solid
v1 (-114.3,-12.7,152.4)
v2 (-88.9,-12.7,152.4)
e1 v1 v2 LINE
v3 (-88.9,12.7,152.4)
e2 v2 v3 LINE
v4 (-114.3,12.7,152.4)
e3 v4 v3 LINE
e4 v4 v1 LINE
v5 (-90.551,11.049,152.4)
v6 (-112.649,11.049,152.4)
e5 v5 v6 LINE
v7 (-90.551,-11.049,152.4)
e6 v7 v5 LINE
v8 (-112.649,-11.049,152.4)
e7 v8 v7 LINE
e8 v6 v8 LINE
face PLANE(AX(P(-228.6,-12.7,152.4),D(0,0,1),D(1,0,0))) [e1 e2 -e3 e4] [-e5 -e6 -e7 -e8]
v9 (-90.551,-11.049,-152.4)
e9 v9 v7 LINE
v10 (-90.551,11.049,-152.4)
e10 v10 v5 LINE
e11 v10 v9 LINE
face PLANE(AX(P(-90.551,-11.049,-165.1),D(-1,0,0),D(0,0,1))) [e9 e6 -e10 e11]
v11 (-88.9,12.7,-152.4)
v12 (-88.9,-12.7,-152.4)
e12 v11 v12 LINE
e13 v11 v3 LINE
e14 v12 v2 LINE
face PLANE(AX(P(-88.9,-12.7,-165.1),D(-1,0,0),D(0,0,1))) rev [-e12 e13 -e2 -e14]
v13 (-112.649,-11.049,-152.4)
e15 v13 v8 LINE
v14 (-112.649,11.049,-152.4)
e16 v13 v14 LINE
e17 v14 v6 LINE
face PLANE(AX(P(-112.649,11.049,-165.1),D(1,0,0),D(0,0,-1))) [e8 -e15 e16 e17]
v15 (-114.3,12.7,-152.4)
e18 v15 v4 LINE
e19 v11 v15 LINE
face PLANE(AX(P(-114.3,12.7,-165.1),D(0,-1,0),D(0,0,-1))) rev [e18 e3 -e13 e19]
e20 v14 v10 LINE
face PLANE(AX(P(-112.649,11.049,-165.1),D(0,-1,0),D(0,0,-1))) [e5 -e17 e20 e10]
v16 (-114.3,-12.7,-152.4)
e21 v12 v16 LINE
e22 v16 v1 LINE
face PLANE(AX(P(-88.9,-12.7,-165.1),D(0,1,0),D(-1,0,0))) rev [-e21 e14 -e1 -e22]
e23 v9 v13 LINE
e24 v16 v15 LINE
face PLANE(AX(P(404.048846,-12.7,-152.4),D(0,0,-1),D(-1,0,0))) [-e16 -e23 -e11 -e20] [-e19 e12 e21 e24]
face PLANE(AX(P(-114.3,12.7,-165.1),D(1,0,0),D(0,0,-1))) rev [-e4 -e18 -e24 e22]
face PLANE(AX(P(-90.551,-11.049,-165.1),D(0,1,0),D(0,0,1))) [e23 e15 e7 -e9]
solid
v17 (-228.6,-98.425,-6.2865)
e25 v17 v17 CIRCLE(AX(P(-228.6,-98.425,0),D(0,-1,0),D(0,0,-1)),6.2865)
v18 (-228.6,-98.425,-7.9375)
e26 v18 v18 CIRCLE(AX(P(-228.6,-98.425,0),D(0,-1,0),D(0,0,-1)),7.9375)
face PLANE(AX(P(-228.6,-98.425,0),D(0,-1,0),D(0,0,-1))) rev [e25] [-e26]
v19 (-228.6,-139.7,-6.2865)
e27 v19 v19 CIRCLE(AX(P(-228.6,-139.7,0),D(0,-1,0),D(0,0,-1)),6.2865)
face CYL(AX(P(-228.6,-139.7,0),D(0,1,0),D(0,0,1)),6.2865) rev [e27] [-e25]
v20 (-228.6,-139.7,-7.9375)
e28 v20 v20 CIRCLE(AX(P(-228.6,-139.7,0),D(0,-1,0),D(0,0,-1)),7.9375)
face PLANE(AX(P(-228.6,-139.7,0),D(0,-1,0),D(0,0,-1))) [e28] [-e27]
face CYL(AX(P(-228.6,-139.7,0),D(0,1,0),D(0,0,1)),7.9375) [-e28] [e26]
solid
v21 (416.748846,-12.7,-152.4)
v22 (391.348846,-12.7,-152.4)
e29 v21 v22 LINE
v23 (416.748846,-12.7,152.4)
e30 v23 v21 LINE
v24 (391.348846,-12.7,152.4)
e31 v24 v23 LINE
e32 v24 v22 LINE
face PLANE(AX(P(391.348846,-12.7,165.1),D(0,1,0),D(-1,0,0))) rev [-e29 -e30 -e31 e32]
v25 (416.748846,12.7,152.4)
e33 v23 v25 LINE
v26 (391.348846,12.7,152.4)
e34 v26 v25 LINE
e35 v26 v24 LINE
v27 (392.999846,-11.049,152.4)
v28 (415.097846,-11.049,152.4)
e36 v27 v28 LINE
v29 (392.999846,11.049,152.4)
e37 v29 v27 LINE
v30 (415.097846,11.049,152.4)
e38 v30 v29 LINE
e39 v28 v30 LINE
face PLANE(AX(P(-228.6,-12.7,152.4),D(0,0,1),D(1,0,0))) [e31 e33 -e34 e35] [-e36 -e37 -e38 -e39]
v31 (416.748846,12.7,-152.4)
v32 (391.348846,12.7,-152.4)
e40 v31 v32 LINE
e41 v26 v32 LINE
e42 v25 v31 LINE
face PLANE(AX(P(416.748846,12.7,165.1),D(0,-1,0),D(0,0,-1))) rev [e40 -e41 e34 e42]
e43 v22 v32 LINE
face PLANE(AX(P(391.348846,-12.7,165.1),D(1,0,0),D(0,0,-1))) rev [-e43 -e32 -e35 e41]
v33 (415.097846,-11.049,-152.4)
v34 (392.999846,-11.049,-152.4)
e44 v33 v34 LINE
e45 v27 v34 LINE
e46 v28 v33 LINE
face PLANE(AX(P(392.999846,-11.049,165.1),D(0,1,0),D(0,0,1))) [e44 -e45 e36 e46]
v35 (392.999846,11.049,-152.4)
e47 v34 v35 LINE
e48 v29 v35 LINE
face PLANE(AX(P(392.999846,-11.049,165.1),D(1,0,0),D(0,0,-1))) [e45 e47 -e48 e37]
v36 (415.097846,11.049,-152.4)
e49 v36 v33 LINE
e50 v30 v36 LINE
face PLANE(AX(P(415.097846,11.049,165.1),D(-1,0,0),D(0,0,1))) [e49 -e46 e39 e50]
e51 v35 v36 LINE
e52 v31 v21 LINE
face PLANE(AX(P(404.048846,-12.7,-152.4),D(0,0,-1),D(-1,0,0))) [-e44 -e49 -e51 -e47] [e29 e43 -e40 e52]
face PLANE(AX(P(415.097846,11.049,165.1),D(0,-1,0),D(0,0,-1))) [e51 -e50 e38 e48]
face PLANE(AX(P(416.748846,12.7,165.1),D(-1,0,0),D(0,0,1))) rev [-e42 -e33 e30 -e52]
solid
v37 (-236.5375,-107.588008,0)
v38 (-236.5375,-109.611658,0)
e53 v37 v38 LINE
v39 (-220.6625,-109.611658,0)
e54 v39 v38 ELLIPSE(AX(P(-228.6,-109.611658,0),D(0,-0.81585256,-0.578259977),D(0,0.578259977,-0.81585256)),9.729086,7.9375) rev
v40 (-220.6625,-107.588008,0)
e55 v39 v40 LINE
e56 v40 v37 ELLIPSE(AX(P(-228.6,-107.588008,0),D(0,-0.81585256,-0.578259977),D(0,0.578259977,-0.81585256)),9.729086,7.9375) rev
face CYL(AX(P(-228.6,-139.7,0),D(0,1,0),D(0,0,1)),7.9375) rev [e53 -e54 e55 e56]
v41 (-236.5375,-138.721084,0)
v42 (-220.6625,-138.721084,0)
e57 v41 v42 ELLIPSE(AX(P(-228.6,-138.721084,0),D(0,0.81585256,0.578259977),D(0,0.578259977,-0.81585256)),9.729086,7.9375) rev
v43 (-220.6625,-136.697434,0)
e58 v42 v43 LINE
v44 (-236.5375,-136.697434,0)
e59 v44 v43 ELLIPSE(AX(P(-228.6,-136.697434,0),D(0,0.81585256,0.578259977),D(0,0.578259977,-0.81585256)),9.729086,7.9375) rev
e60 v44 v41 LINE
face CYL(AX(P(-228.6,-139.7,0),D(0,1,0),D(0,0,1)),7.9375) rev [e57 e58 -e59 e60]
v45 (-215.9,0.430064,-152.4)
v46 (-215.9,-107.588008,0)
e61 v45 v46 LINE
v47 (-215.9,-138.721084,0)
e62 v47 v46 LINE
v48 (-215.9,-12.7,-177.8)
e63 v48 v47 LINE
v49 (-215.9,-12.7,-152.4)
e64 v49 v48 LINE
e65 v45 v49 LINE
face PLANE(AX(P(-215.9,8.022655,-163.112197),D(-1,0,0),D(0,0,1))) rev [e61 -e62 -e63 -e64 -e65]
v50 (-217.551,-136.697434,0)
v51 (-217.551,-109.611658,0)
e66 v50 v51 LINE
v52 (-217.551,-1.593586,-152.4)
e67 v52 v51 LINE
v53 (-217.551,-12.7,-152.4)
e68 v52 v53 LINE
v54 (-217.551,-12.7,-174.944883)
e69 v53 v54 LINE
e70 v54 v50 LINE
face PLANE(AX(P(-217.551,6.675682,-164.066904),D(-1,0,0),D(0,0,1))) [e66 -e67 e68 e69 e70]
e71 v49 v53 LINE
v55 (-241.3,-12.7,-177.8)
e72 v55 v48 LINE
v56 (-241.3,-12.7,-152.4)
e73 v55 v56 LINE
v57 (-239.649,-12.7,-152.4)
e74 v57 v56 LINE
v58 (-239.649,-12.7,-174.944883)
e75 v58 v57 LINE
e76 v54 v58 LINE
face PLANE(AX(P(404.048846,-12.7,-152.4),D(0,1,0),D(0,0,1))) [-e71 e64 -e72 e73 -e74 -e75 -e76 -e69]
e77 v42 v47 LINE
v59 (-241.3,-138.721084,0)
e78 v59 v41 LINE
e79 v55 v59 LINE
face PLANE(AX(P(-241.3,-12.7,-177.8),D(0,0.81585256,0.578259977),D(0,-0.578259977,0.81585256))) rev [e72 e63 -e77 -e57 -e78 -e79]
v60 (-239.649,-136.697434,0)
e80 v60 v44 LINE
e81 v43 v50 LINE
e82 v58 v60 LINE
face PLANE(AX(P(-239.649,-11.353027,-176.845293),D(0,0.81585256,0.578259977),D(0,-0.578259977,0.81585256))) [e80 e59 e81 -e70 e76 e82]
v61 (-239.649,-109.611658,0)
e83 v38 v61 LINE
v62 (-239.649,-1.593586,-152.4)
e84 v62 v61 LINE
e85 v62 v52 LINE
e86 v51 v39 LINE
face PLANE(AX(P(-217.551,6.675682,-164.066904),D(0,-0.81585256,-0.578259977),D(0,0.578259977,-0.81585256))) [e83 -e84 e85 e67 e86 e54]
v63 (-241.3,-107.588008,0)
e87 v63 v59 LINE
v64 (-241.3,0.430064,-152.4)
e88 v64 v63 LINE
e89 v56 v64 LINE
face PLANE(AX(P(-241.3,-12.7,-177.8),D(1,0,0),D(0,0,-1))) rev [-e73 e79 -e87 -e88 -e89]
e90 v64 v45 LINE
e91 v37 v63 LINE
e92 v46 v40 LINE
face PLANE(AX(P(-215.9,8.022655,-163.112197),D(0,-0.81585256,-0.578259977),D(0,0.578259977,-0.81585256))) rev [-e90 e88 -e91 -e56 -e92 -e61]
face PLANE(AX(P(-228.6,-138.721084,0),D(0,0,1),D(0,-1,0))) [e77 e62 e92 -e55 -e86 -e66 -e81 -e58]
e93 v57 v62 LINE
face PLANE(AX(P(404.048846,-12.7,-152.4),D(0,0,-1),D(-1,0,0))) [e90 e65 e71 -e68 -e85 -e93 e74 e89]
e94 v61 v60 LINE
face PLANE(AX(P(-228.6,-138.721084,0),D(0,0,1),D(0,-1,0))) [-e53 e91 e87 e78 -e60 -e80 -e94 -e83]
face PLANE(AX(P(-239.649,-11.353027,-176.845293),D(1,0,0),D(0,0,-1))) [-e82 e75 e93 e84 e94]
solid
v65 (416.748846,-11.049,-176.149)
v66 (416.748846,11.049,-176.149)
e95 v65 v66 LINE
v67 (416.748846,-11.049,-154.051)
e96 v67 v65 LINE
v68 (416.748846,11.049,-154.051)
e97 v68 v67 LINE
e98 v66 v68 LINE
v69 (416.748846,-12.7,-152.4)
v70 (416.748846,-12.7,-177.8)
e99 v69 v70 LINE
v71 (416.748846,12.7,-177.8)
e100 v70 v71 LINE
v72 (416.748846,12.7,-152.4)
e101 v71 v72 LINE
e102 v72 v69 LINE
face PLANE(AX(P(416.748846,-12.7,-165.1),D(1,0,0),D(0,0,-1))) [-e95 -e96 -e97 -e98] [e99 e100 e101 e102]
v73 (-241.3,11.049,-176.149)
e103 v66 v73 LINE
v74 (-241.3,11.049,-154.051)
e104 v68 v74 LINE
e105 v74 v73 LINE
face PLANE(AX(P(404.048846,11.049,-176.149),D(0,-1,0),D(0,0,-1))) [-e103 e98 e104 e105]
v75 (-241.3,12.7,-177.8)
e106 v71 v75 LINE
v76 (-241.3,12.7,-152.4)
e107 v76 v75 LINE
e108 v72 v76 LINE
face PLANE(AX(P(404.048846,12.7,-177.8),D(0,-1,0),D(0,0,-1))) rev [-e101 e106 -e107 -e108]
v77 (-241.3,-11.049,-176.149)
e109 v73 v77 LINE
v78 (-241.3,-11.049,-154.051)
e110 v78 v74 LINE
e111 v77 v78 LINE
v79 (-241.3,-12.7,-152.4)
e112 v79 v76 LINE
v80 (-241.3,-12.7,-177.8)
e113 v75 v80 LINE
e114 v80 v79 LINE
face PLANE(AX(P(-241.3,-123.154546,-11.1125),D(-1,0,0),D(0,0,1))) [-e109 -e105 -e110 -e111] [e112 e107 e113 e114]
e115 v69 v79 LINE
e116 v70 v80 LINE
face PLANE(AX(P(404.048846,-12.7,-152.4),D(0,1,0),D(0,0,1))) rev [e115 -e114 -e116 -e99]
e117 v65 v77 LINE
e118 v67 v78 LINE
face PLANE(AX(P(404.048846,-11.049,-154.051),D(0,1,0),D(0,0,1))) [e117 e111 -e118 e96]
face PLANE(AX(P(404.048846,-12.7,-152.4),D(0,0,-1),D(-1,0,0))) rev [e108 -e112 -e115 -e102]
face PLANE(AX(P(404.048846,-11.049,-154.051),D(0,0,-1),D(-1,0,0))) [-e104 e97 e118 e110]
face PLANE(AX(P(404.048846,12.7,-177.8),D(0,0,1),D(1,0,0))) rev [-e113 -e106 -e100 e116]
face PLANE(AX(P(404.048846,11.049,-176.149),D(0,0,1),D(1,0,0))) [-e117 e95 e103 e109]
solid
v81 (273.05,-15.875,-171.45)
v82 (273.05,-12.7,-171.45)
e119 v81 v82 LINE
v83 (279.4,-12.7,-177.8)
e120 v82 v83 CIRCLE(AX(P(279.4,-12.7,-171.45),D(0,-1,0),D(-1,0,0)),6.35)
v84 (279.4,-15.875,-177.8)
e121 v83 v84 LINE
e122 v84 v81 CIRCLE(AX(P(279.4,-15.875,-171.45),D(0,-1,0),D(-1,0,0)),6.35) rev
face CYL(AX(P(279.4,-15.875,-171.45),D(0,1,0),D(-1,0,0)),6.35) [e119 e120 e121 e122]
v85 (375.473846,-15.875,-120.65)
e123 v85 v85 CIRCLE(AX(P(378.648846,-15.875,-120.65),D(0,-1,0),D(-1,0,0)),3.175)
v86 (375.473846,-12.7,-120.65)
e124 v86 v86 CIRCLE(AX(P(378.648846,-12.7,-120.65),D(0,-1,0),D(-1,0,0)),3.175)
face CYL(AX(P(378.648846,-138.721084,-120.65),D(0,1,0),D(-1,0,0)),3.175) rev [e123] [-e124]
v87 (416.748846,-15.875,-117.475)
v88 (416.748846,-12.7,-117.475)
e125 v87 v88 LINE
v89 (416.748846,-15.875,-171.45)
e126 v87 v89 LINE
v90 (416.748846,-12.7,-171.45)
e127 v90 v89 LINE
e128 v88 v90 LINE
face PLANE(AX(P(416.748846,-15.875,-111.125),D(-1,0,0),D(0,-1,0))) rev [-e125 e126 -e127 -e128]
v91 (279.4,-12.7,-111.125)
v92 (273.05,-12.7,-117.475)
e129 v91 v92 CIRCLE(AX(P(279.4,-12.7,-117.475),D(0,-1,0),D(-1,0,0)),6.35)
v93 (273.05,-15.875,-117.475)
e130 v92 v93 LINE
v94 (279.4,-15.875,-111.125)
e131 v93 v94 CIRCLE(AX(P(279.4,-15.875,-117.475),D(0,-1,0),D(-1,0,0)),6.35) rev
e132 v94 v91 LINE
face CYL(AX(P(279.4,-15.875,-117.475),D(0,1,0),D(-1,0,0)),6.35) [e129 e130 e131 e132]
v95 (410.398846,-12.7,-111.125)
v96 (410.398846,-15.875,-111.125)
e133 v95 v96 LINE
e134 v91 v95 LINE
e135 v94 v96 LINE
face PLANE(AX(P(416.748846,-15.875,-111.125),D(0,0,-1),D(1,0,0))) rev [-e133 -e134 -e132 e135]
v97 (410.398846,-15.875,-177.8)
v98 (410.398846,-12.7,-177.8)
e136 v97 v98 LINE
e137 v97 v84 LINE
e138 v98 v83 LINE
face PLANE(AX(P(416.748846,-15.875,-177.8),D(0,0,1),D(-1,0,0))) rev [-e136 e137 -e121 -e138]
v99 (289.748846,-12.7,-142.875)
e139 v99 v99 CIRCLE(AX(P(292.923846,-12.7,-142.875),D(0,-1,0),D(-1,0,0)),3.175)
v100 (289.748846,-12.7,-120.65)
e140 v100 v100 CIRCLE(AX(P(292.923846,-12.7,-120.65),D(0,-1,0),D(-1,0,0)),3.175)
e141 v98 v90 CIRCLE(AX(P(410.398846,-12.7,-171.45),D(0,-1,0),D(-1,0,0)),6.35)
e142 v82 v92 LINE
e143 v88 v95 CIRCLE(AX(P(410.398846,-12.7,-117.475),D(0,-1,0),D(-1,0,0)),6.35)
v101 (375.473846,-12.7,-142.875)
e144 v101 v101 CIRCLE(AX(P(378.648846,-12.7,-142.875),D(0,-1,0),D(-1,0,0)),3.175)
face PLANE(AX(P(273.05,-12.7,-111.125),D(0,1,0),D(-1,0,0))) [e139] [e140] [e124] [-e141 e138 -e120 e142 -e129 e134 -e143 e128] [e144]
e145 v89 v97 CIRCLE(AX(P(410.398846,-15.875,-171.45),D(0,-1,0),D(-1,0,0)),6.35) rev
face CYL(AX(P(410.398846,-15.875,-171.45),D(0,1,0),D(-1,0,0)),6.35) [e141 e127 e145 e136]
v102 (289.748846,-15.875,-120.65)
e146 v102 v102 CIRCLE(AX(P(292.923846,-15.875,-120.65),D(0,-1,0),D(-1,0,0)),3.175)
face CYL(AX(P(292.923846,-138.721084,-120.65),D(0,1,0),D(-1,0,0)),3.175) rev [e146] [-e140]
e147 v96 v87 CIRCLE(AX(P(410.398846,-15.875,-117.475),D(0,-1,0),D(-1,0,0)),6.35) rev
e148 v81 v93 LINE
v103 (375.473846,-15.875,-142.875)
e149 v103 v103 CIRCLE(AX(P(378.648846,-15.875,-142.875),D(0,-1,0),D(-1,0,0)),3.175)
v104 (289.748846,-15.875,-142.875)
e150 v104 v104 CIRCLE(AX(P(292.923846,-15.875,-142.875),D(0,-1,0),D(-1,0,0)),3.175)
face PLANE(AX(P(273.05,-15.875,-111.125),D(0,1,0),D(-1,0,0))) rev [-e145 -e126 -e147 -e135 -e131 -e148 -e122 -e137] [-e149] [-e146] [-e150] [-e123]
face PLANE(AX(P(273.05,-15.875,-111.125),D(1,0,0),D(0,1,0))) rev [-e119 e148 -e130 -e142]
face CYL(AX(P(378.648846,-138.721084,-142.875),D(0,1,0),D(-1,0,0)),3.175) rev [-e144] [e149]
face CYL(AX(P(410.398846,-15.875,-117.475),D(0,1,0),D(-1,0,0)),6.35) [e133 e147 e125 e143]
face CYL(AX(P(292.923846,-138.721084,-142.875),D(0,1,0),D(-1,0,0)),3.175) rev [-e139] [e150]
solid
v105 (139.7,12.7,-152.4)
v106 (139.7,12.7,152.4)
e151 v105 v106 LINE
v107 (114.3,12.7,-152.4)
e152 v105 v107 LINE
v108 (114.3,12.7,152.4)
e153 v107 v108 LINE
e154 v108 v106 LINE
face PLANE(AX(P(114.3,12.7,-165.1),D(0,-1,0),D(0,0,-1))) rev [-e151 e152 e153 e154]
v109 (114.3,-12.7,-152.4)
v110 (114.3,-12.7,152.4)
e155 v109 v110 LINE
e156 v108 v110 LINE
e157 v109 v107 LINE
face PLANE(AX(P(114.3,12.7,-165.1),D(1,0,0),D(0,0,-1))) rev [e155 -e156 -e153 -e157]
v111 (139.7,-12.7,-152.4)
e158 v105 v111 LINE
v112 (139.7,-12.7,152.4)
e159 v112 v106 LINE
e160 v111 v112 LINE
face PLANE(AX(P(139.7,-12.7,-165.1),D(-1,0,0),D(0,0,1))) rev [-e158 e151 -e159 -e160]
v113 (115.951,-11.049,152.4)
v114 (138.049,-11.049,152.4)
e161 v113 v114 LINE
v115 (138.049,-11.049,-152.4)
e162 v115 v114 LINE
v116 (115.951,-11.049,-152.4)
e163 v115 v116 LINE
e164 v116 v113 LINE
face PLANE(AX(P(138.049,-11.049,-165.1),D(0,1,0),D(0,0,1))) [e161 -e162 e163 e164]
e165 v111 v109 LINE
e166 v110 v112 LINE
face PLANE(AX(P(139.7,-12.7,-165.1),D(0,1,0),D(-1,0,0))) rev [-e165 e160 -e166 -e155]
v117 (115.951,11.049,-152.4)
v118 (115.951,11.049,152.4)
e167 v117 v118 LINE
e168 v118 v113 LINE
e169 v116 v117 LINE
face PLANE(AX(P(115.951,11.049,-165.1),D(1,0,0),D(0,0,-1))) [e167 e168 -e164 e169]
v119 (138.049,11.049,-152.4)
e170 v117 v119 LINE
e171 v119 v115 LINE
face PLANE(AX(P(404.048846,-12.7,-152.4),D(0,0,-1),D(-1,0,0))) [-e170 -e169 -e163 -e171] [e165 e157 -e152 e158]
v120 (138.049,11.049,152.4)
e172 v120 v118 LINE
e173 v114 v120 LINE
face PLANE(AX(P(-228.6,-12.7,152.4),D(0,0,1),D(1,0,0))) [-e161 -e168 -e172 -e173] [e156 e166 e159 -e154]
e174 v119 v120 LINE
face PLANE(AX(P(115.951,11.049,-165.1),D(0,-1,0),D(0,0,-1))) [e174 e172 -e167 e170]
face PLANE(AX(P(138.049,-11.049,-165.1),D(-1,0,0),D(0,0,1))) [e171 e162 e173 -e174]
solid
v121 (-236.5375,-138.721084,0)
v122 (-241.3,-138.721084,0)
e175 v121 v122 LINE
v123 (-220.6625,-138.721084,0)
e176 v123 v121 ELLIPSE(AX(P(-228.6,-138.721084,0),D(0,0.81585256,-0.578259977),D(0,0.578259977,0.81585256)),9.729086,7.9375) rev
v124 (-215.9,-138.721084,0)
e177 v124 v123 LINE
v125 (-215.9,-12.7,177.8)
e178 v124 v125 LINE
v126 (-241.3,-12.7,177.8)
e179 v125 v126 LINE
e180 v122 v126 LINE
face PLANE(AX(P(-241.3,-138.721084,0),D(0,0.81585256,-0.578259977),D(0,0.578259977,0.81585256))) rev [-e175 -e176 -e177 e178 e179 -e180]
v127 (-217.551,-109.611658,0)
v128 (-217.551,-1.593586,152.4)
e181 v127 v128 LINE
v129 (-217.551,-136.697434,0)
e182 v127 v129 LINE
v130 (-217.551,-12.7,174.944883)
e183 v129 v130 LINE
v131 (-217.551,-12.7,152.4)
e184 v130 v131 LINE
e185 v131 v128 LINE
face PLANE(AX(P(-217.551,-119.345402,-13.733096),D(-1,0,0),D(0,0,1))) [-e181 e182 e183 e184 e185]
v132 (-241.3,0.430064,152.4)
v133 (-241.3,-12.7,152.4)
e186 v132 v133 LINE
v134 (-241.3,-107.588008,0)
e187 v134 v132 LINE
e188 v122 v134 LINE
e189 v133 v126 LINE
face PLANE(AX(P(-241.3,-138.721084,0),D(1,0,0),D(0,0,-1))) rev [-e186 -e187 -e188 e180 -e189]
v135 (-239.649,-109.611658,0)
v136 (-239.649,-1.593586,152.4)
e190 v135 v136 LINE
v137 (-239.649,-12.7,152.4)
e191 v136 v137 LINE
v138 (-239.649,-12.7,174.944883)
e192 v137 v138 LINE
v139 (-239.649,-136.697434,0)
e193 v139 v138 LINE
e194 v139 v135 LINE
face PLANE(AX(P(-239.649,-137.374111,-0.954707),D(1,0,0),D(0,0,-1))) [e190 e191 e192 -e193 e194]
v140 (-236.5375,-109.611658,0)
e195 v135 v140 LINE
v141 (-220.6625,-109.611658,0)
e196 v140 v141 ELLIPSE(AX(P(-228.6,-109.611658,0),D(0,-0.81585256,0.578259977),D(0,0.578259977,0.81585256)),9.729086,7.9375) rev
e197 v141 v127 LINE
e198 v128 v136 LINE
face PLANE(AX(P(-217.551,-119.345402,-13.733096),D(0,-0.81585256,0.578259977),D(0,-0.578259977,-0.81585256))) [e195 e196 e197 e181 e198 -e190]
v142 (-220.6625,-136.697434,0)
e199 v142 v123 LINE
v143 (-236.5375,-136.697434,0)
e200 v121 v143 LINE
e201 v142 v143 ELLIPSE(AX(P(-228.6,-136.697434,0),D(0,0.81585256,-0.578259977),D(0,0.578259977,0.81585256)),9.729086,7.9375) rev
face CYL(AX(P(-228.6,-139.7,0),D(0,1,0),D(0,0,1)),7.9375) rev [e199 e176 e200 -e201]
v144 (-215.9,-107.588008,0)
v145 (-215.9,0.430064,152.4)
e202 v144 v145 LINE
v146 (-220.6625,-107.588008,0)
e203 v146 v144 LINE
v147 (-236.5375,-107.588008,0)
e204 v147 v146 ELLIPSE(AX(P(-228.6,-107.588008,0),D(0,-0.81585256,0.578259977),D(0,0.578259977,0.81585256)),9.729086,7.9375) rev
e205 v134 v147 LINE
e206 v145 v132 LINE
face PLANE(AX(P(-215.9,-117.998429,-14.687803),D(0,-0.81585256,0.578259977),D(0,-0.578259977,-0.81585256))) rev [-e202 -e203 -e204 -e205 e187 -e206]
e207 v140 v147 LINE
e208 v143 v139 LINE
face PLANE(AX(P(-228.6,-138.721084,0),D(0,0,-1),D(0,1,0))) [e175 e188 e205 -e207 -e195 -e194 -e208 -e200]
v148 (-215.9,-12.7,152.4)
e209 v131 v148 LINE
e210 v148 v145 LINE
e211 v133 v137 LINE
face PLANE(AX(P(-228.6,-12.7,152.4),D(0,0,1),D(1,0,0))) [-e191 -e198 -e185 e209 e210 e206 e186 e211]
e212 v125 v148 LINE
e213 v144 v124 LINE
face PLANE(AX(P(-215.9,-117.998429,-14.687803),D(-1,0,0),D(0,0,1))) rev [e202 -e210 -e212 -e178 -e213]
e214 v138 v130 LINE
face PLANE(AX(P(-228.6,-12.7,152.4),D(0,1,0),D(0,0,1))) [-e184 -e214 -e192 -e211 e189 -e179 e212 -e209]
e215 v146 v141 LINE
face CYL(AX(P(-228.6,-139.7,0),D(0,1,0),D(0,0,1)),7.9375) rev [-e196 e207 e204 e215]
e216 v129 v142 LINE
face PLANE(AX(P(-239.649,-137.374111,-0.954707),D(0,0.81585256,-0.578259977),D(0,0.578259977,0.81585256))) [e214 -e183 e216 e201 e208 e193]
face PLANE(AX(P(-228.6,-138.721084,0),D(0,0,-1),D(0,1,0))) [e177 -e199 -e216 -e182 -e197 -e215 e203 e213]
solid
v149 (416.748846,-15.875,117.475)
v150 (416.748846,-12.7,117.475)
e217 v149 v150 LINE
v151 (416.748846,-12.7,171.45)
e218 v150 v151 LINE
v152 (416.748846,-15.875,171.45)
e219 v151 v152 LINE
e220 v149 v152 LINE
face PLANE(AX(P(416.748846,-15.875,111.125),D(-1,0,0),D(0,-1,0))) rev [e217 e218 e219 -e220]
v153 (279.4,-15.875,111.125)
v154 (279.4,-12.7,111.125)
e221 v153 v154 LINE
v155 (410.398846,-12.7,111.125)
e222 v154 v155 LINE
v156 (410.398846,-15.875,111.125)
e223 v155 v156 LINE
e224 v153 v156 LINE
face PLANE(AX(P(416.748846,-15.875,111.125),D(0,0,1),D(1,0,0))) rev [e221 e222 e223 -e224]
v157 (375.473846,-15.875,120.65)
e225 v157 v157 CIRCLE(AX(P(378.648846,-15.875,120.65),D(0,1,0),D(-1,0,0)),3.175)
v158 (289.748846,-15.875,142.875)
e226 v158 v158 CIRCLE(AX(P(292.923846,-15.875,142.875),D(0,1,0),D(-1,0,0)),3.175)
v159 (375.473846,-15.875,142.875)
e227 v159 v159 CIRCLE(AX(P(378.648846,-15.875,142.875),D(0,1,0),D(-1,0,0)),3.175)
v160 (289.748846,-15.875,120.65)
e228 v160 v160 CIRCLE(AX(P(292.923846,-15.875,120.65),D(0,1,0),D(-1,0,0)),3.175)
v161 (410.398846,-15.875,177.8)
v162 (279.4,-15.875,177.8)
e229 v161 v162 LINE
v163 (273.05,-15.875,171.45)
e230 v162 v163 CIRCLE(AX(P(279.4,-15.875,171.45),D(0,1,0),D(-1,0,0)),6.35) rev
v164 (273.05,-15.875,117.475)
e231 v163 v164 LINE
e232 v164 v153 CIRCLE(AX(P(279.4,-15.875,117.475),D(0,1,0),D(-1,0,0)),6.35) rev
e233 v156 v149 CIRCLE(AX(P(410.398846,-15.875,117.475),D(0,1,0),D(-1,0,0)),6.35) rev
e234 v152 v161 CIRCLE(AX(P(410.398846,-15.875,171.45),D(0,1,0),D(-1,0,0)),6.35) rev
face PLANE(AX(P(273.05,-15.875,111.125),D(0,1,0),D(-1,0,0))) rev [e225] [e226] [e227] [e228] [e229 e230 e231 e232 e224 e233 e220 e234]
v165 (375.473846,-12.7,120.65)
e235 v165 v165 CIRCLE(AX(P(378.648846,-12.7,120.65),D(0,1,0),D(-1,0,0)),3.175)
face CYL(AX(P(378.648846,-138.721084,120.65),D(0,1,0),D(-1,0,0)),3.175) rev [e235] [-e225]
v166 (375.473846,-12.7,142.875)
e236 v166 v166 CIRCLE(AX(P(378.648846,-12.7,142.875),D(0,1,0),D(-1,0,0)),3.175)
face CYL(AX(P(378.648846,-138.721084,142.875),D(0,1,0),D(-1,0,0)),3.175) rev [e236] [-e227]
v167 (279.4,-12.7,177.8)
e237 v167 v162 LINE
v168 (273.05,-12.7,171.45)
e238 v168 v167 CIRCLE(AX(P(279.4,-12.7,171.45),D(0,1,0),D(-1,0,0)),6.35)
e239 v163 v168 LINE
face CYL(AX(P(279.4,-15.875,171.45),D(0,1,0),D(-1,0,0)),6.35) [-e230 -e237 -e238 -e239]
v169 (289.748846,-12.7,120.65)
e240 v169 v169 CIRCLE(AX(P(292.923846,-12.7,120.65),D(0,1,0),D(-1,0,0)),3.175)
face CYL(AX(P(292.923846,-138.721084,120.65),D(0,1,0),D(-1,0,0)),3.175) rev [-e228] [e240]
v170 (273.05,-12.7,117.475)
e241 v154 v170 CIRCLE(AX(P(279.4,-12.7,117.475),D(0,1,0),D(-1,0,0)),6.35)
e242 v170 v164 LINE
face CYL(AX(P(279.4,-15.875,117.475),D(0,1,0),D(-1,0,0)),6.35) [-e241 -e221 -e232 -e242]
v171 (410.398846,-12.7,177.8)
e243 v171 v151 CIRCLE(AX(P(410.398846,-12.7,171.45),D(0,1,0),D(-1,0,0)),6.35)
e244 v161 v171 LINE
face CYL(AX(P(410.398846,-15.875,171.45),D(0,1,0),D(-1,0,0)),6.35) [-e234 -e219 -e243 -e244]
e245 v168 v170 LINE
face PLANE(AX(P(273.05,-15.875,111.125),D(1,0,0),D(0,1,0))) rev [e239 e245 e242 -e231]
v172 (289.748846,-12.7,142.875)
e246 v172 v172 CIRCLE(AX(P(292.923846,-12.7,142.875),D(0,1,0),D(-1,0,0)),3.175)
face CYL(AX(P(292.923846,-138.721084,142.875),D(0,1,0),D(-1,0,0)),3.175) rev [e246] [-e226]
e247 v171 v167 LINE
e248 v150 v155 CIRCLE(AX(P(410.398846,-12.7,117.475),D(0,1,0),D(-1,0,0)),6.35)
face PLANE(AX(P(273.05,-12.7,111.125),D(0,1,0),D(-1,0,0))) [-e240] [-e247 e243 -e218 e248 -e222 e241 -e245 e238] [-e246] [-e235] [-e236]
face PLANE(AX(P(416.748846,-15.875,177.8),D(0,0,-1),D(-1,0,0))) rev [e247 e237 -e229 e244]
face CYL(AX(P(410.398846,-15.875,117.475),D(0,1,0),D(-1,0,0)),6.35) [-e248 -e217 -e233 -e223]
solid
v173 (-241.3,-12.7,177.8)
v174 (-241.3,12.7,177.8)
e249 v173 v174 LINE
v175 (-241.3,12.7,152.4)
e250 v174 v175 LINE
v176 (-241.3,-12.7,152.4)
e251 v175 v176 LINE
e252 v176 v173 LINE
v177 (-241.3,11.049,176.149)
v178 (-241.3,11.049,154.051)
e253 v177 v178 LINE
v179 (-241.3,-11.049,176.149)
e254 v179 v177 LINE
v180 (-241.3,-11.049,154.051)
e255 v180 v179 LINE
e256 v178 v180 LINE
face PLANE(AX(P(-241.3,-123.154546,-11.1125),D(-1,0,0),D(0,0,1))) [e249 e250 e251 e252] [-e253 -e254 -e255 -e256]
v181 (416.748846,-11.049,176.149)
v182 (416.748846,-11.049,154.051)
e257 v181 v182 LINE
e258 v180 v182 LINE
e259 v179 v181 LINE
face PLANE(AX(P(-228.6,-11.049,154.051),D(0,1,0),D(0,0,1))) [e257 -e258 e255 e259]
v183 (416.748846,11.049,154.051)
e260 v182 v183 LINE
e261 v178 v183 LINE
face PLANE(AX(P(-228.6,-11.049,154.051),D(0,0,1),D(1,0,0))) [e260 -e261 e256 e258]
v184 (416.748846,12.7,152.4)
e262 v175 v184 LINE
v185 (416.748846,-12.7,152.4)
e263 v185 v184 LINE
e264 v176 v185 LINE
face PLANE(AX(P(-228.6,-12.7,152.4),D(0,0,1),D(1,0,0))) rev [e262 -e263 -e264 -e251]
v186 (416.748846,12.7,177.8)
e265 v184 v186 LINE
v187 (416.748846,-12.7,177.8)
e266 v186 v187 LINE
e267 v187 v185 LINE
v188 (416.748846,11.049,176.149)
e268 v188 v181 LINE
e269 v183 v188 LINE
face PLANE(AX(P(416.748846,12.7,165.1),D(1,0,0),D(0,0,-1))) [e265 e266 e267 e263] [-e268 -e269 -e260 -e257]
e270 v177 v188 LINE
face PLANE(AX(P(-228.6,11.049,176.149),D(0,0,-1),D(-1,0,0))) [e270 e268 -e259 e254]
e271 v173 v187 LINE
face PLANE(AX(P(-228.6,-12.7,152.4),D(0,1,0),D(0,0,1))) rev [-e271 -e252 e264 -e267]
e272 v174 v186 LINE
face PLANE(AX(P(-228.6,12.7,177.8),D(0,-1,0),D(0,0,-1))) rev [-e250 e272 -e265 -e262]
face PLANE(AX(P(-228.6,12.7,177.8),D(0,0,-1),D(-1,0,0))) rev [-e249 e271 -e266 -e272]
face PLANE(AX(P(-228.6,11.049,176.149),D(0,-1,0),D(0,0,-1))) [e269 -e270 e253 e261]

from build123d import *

# Parameters (mm, degrees)
BED_START                  = -12.7
BED_MEMBERS_OUTLINE_W      = 1.651
BED_MEMBERS_OUTLINE_H      = 304.8
BED_MEMBERS_DEPTH          = 25.4
BED_MEMBERS_2_OUTLINE_W    = 22.098
BED_MEMBERS_2_OUTLINE_H    = 304.8
BED_MEMBERS_2_DEPTH        = 1.651
BED_START_2                = 11.049
BED_MEMBERS_3_OUTLINE_W    = 22.098
BED_MEMBERS_3_OUTLINE_H    = 304.8
BED_MEMBERS_3_DEPTH        = 1.651
BED_START_3                = 152.4
BED_MEMBERS_4_OUTLINE_W    = 645.34884646
BED_MEMBERS_4_OUTLINE_H    = 1.651
BED_MEMBERS_4_DEPTH        = 25.4
BED_MEMBERS_5_OUTLINE_W    = 645.34884646
BED_MEMBERS_5_OUTLINE_H    = 22.098
BED_MEMBERS_5_DEPTH        = 1.651
BED_START_4                = 176.149
BED_MEMBERS_6_OUTLINE_W    = 645.34884646
BED_MEMBERS_6_OUTLINE_H    = 22.098
BED_MEMBERS_6_DEPTH        = 1.651
BED_START_5                = -177.8
BED_MEMBERS_7_OUTLINE_W    = 645.34884646
BED_MEMBERS_7_OUTLINE_H    = 1.651
BED_MEMBERS_7_DEPTH        = 25.4
BED_MEMBERS_8_OUTLINE_W    = 645.34884646
BED_MEMBERS_8_OUTLINE_H    = 22.098
BED_MEMBERS_8_DEPTH        = 1.651
BED_START_6                = -154.051
BED_MEMBERS_9_OUTLINE_W    = 645.34884646
BED_MEMBERS_9_OUTLINE_H    = 22.098
BED_MEMBERS_9_DEPTH        = 1.651
SKETCH1_W                  = 25.4
SKETCH1_H                  = 25.4
SKETCH1_W_2                = 22.098
SKETCH1_H_2                = 22.098
BED_CROSSMEMBERS_DEPTH     = 330.2
SKETCH1_ON_SEGMENT_2_W     = 25.4
SKETCH1_ON_SEGMENT_2_H     = 25.4
SKETCH1_ON_SEGMENT_2_W_2   = 22.098
SKETCH1_ON_SEGMENT_2_H_2   = 22.098
BED_CROSSMEMBERS_2_DEPTH   = 330.2
SKETCH132_W                = 25.4
SKETCH132_H                = 25.4
SKETCH132_W_2              = 22.098
SKETCH132_H_2              = 22.098
REAR_LEG_MEMBERS_DEPTH     = 240.663092099
SKETCH132_ON_SEGMENT_2_W   = 25.4
SKETCH132_ON_SEGMENT_2_H   = 25.4
SKETCH132_ON_SEGMENT_2_W_2 = 22.098
SKETCH132_ON_SEGMENT_2_H_2 = 22.098
REAR_LEG_MEMBERS_2_DEPTH   = 240.663092099
SKETCH133_W                = 143.69884646
SKETCH133_H                = 66.675
FRONT_LEG_PLATE_DEPTH      = 3.175
FRONT_LEG_PLATE_FILLET_R   = 6.35
SKETCH136_R                = 3.175
FRONT_LEG_BOLT_HOLES_DEPTH = 471.291138189
TRIM_EXTEND1_START         = -165.1
TRIM_EXTEND1_OUTLINE_W     = 25.4
TRIM_EXTEND1_OUTLINE_H     = 25.4
TRIM_EXTEND1_OUTLINE_W_2   = 22.098
TRIM_EXTEND1_OUTLINE_H_2   = 22.098
TRIM_EXTEND1_DEPTH         = 12.7
TRIM_EXTEND1_START_2       = 152.4
TRIM_EXTEND1_2_OUTLINE_W   = 25.4
TRIM_EXTEND1_2_OUTLINE_H   = 25.4
TRIM_EXTEND1_2_OUTLINE_W_2 = 22.098
TRIM_EXTEND1_2_OUTLINE_H_2 = 22.098
TRIM_EXTEND1_2_DEPTH       = 12.7
TRIM_EXTEND1_3_OUTLINE_W   = 25.4
TRIM_EXTEND1_3_OUTLINE_H   = 25.4
TRIM_EXTEND1_3_OUTLINE_W_2 = 22.098
TRIM_EXTEND1_3_OUTLINE_H_2 = 22.098
TRIM_EXTEND1_3_DEPTH       = 12.7
TRIM_EXTEND1_4_OUTLINE_W   = 25.4
TRIM_EXTEND1_4_OUTLINE_H   = 25.4
TRIM_EXTEND1_4_OUTLINE_W_2 = 22.098
TRIM_EXTEND1_4_OUTLINE_H_2 = 22.098
TRIM_EXTEND1_4_DEPTH       = 12.7
TRIM_EXTEND1_START_3       = -177.8
TRIM_EXTEND1_5_OUTLINE_W   = 25.4
TRIM_EXTEND1_5_OUTLINE_H   = 22.7
TRIM_EXTEND1_5_DEPTH       = 25.4
TRIM_EXTEND1_6_OUTLINE_W   = 25.4
TRIM_EXTEND1_6_OUTLINE_H   = 22.7
TRIM_EXTEND1_6_DEPTH       = 25.4
SKETCH139_R                = 7.9375
SKETCH139_R_2              = 6.2865
CASTER_PIVOT_TUBE_DEPTH    = 41.275
TRIM_EXTEND4_START         = -241.3
TRIM_EXTEND4_OUTLINE_W     = 25.4
TRIM_EXTEND4_OUTLINE_H     = 25.4
TRIM_EXTEND4_OUTLINE_W_2   = 22.098
TRIM_EXTEND4_OUTLINE_H_2   = 22.098
TRIM_EXTEND4_DEPTH         = 12.7


# Read off the part's stored shape, not the designer's step: Bed members, Trim/Extend1, Trim/Extend4
with BuildPart() as part:
    # Bed members outline → Bed members (new body)
    with BuildSketch(Plane(origin=(0, 0, 0), x_dir=(1, 0, 0), z_dir=(0, 1, 0)).offset(BED_START)):
        with Locations((415.92334646, 0)):
            Rectangle(BED_MEMBERS_OUTLINE_W, BED_MEMBERS_OUTLINE_H)
        with Locations((392.17434646, 0)):
            Rectangle(BED_MEMBERS_OUTLINE_W, BED_MEMBERS_OUTLINE_H)
    extrude(amount=BED_MEMBERS_DEPTH)

    # Bed members 2 outline → Bed members 2 (add)
    with BuildSketch(Plane(origin=(0, 0, 0), x_dir=(1, 0, 0), z_dir=(0, 1, 0)).offset(BED_START)):
        with Locations((404.04884646, 0)):
            Rectangle(BED_MEMBERS_2_OUTLINE_W, BED_MEMBERS_2_OUTLINE_H)
    extrude(amount=BED_MEMBERS_2_DEPTH)

    # Bed members 3 outline → Bed members 3 (add)
    with BuildSketch(Plane(origin=(0, 0, 0), x_dir=(1, 0, 0), z_dir=(0, 1, 0)).offset(BED_START_2)):
        with Locations((404.04884646, 0)):
            Rectangle(BED_MEMBERS_3_OUTLINE_W, BED_MEMBERS_3_OUTLINE_H)
    extrude(amount=BED_MEMBERS_3_DEPTH)


with BuildPart() as body_2:
    # Bed members 4 outline → Bed members 4 (new body)
    with BuildSketch(Plane.XY.offset(BED_START_3)):
        with Locations((94.07442323, 11.8745)):
            Rectangle(BED_MEMBERS_4_OUTLINE_W, BED_MEMBERS_4_OUTLINE_H)
        with Locations((94.07442323, -11.8745)):
            Rectangle(BED_MEMBERS_4_OUTLINE_W, BED_MEMBERS_4_OUTLINE_H)
    extrude(amount=BED_MEMBERS_4_DEPTH)

    # Bed members 5 outline → Bed members 5 (add)
    with BuildSketch(Plane.XY.offset(BED_START_3)):
        with Locations((94.07442323, 0)):
            Rectangle(BED_MEMBERS_5_OUTLINE_W, BED_MEMBERS_5_OUTLINE_H)
    extrude(amount=BED_MEMBERS_5_DEPTH)

    # Bed members 6 outline → Bed members 6 (add)
    with BuildSketch(Plane.XY.offset(BED_START_4)):
        with Locations((94.07442323, 0)):
            Rectangle(BED_MEMBERS_6_OUTLINE_W, BED_MEMBERS_6_OUTLINE_H)
    extrude(amount=BED_MEMBERS_6_DEPTH)



with BuildPart() as body_3:
    # Bed members 7 outline → Bed members 7 (new body)
    with BuildSketch(Plane.XY.offset(BED_START_5)):
        with Locations((94.07442323, 11.8745)):
            Rectangle(BED_MEMBERS_7_OUTLINE_W, BED_MEMBERS_7_OUTLINE_H)
        with Locations((94.07442323, -11.8745)):
            Rectangle(BED_MEMBERS_7_OUTLINE_W, BED_MEMBERS_7_OUTLINE_H)
    extrude(amount=BED_MEMBERS_7_DEPTH)

    # Bed members 8 outline → Bed members 8 (add)
    with BuildSketch(Plane.XY.offset(BED_START_5)):
        with Locations((94.07442323, 0)):
            Rectangle(BED_MEMBERS_8_OUTLINE_W, BED_MEMBERS_8_OUTLINE_H)
    extrude(amount=BED_MEMBERS_8_DEPTH)

    # Bed members 9 outline → Bed members 9 (add)
    with BuildSketch(Plane.XY.offset(BED_START_6)):
        with Locations((94.07442323, 0)):
            Rectangle(BED_MEMBERS_9_OUTLINE_W, BED_MEMBERS_9_OUTLINE_H)
    extrude(amount=BED_MEMBERS_9_DEPTH)


with BuildPart() as body_4:
    # Sketch1 → Bed crossmembers (new body)
    with BuildSketch(Plane(origin=(127, 0, 165.1), x_dir=(-1, 0, 0), z_dir=(0, 0, -1))):
        Rectangle(SKETCH1_W, SKETCH1_H)
        Rectangle(SKETCH1_W_2, SKETCH1_H_2, mode=Mode.SUBTRACT)
    extrude(amount=BED_CROSSMEMBERS_DEPTH)

    # Trim/Extend1 outline → Trim/Extend1 (cut)
    with BuildSketch(Plane.XY.offset(TRIM_EXTEND1_START)):
        with Locations((127, 0)):
            Rectangle(TRIM_EXTEND1_OUTLINE_W, TRIM_EXTEND1_OUTLINE_H)
        with Locations((127, 0)):
            Rectangle(TRIM_EXTEND1_OUTLINE_W_2, TRIM_EXTEND1_OUTLINE_H_2, mode=Mode.SUBTRACT)
    extrude(amount=TRIM_EXTEND1_DEPTH, mode=Mode.SUBTRACT)

    # Trim_Extend1 2 outline → Trim_Extend1 2 (cut)
    with BuildSketch(Plane.XY.offset(TRIM_EXTEND1_START_2)):
        with Locations((127, 0)):
            Rectangle(TRIM_EXTEND1_2_OUTLINE_W, TRIM_EXTEND1_2_OUTLINE_H)
        with Locations((127, 0)):
            Rectangle(TRIM_EXTEND1_2_OUTLINE_W_2, TRIM_EXTEND1_2_OUTLINE_H_2, mode=Mode.SUBTRACT)
    extrude(amount=TRIM_EXTEND1_2_DEPTH, mode=Mode.SUBTRACT)


with BuildPart() as body_5:
    # Sketch1 on segment 2 (carried to segment 2) → Bed crossmembers 2 (new body)
    with BuildSketch(Plane(origin=(-101.6, 0, 165.1), x_dir=(-1, 0, 0), z_dir=(0, 0, -1))):
        Rectangle(SKETCH1_ON_SEGMENT_2_W, SKETCH1_ON_SEGMENT_2_H)
        Rectangle(SKETCH1_ON_SEGMENT_2_W_2, SKETCH1_ON_SEGMENT_2_H_2, mode=Mode.SUBTRACT)
    extrude(amount=BED_CROSSMEMBERS_2_DEPTH)

    # Trim_Extend1 3 outline → Trim_Extend1 3 (cut)
    with BuildSketch(Plane.XY.offset(TRIM_EXTEND1_START)):
        with Locations((-101.6, 0)):
            Rectangle(TRIM_EXTEND1_3_OUTLINE_W, TRIM_EXTEND1_3_OUTLINE_H)
        with Locations((-101.6, 0)):
            Rectangle(TRIM_EXTEND1_3_OUTLINE_W_2, TRIM_EXTEND1_3_OUTLINE_H_2, mode=Mode.SUBTRACT)
    extrude(amount=TRIM_EXTEND1_3_DEPTH, mode=Mode.SUBTRACT)

    # Trim_Extend1 4 outline → Trim_Extend1 4 (cut)
    with BuildSketch(Plane.XY.offset(TRIM_EXTEND1_START_2)):
        with Locations((-101.6, 0)):
            Rectangle(TRIM_EXTEND1_4_OUTLINE_W, TRIM_EXTEND1_4_OUTLINE_H)
        with Locations((-101.6, 0)):
            Rectangle(TRIM_EXTEND1_4_OUTLINE_W_2, TRIM_EXTEND1_4_OUTLINE_H_2, mode=Mode.SUBTRACT)
    extrude(amount=TRIM_EXTEND1_4_DEPTH, mode=Mode.SUBTRACT)


with BuildPart() as body_6:
    # Sketch132 → Rear leg members (new body)
    with BuildSketch(Plane(origin=(-228.6, -2.338672494, 170.45609829), x_dir=(0, 0.8158525595063999, -0.5782599771269463), z_dir=(0, -0.5782599771269463, -0.8158525595063999))):
        Rectangle(SKETCH132_W, SKETCH132_H)
        Rectangle(SKETCH132_W_2, SKETCH132_H_2, mode=Mode.SUBTRACT)
    extrude(amount=REAR_LEG_MEMBERS_DEPTH)

    # Rear leg members mitre 1
    split(bisect_by=Plane(origin=(-228.6, -138.721084, 0), x_dir=(0, -1, 0), z_dir=(0, 0, 1)), keep=Keep.TOP)

    # Trim_Extend1 6 outline → Trim_Extend1 6 (cut)
    with BuildSketch(Plane.XY.offset(TRIM_EXTEND1_START_2)):
        with Locations((-228.6, -1.35)):
            Rectangle(TRIM_EXTEND1_6_OUTLINE_W, TRIM_EXTEND1_6_OUTLINE_H)
    extrude(amount=TRIM_EXTEND1_6_DEPTH, mode=Mode.SUBTRACT)


with BuildPart() as body_7:
    # Sketch132 on segment 2 (carried to segment 2) → Rear leg members 2 (new body)
    with BuildSketch(Plane(origin=(-228.6, -141.504506626, 25.889501377), x_dir=(0, 0.81585256, 0.578259977), z_dir=(0, 0.578259977, -0.81585256))):
        Rectangle(SKETCH132_ON_SEGMENT_2_W, SKETCH132_ON_SEGMENT_2_H)
        Rectangle(SKETCH132_ON_SEGMENT_2_W_2, SKETCH132_ON_SEGMENT_2_H_2, mode=Mode.SUBTRACT)
    extrude(amount=REAR_LEG_MEMBERS_2_DEPTH)

    # Rear leg members 2 mitre 1
    split(bisect_by=Plane(origin=(-228.6, -138.721084, 0), x_dir=(0, 1, 0), z_dir=(0, 0, -1)), keep=Keep.TOP)

    # Trim_Extend1 5 outline → Trim_Extend1 5 (cut)
    with BuildSketch(Plane.XY.offset(TRIM_EXTEND1_START_3)):
        with Locations((-228.6, -1.35)):
            Rectangle(TRIM_EXTEND1_5_OUTLINE_W, TRIM_EXTEND1_5_OUTLINE_H)
    extrude(amount=TRIM_EXTEND1_5_DEPTH, mode=Mode.SUBTRACT)


with BuildPart() as body_8:
    # Sketch133 → Front leg plate (new body)
    with BuildSketch(Plane.XZ.offset(12.7)):
        with Locations((344.89942323, 144.4625)):
            Rectangle(SKETCH133_W, SKETCH133_H)
    extrude(amount=FRONT_LEG_PLATE_DEPTH)

    # Front leg plate fillet
    front_leg_plate_fillet_edges = [body_8.edges().sort_by_distance(p)[0] for p in [
        (273.05, -14.2875, 111.125),
        (273.05, -14.2875, 177.8),
        (416.74884646, -14.2875, 177.8),
        (416.74884646, -14.2875, 111.125),
    ]]
    fillet(front_leg_plate_fillet_edges, radius=FRONT_LEG_PLATE_FILLET_R)

    # Sketch136 → Front leg bolt holes (cut, through all)
    with BuildSketch(Plane(origin=(0, -12.7, 0), x_dir=(1, 0, 0), z_dir=(0, 1, 0))):
        with Locations(Location((292.92384646, -120.65, 0), (0, 0, 180))):
            Circle(SKETCH136_R)
        with Locations(Location((292.92384646, -142.875, 0), (0, 0, 180))):
            Circle(SKETCH136_R)
        with Locations(Location((378.64884646, -142.875, 0), (0, 0, 180))):
            Circle(SKETCH136_R)
        with Locations(Location((378.64884646, -120.65, 0), (0, 0, 180))):
            Circle(SKETCH136_R)
    extrude(amount=-FRONT_LEG_BOLT_HOLES_DEPTH, mode=Mode.SUBTRACT)


with BuildPart() as body_9:
    # Front leg plate mirror: mirrored copy
    add(body_8.part.mirror(Plane.XY))


with BuildPart() as body_10:
    # Sketch139 → Caster pivot tube (new body)
    with BuildSketch(Plane(origin=(-228.6, -98.425, 0), x_dir=(0, 0, -1), z_dir=(0, -1, 0))):
        Circle(SKETCH139_R)
        Circle(SKETCH139_R_2, mode=Mode.SUBTRACT)
    extrude(amount=CASTER_PIVOT_TUBE_DEPTH)


with BuildPart() as body_2_1:
    add(body_2.part)

    add(body_3.part)  # Trim/Extend4 merges body 3
    # Trim/Extend4 outline → Trim/Extend4 (add)
    # profile 1 of 2: a face of its own
    with BuildSketch(Plane.YZ.offset(TRIM_EXTEND4_START)):
        with Locations((0, 165.1)):
            Rectangle(TRIM_EXTEND4_OUTLINE_W, TRIM_EXTEND4_OUTLINE_H)
        with Locations((0, 165.1)):
            Rectangle(TRIM_EXTEND4_OUTLINE_W_2, TRIM_EXTEND4_OUTLINE_H_2, mode=Mode.SUBTRACT)
    # profile 2 of 2: a face of its own
    with BuildSketch(Plane.YZ.offset(TRIM_EXTEND4_START)):
        with Locations((0, -165.1)):
            Rectangle(TRIM_EXTEND4_OUTLINE_W, TRIM_EXTEND4_OUTLINE_H)
        with Locations((0, -165.1)):
            Rectangle(TRIM_EXTEND4_OUTLINE_W_2, TRIM_EXTEND4_OUTLINE_H_2, mode=Mode.SUBTRACT)
    extrude(amount=TRIM_EXTEND4_DEPTH)


with BuildPart() as body_6_1:
    add(body_6.part)

    # Trim/Extend3: cut back where it meets the other member's skin (coped)
    split(bisect_by=body_10.part.faces().sort_by_distance((-228.6, -119.0625, 7.9375))[0], keep=Keep.TOP)


with BuildPart() as body_7_1:
    add(body_7.part)

    # Trim/Extend3: cut back where it meets the other member's skin (coped)
    split(bisect_by=body_10.part.faces().sort_by_distance((-228.6, -119.0625, 7.9375))[0], keep=Keep.TOP)


solid = Compound([part.part, body_4.part, body_5.part, body_8.part, body_9.part, body_10.part, body_2_1.part, body_6_1.part, body_7_1.part])
